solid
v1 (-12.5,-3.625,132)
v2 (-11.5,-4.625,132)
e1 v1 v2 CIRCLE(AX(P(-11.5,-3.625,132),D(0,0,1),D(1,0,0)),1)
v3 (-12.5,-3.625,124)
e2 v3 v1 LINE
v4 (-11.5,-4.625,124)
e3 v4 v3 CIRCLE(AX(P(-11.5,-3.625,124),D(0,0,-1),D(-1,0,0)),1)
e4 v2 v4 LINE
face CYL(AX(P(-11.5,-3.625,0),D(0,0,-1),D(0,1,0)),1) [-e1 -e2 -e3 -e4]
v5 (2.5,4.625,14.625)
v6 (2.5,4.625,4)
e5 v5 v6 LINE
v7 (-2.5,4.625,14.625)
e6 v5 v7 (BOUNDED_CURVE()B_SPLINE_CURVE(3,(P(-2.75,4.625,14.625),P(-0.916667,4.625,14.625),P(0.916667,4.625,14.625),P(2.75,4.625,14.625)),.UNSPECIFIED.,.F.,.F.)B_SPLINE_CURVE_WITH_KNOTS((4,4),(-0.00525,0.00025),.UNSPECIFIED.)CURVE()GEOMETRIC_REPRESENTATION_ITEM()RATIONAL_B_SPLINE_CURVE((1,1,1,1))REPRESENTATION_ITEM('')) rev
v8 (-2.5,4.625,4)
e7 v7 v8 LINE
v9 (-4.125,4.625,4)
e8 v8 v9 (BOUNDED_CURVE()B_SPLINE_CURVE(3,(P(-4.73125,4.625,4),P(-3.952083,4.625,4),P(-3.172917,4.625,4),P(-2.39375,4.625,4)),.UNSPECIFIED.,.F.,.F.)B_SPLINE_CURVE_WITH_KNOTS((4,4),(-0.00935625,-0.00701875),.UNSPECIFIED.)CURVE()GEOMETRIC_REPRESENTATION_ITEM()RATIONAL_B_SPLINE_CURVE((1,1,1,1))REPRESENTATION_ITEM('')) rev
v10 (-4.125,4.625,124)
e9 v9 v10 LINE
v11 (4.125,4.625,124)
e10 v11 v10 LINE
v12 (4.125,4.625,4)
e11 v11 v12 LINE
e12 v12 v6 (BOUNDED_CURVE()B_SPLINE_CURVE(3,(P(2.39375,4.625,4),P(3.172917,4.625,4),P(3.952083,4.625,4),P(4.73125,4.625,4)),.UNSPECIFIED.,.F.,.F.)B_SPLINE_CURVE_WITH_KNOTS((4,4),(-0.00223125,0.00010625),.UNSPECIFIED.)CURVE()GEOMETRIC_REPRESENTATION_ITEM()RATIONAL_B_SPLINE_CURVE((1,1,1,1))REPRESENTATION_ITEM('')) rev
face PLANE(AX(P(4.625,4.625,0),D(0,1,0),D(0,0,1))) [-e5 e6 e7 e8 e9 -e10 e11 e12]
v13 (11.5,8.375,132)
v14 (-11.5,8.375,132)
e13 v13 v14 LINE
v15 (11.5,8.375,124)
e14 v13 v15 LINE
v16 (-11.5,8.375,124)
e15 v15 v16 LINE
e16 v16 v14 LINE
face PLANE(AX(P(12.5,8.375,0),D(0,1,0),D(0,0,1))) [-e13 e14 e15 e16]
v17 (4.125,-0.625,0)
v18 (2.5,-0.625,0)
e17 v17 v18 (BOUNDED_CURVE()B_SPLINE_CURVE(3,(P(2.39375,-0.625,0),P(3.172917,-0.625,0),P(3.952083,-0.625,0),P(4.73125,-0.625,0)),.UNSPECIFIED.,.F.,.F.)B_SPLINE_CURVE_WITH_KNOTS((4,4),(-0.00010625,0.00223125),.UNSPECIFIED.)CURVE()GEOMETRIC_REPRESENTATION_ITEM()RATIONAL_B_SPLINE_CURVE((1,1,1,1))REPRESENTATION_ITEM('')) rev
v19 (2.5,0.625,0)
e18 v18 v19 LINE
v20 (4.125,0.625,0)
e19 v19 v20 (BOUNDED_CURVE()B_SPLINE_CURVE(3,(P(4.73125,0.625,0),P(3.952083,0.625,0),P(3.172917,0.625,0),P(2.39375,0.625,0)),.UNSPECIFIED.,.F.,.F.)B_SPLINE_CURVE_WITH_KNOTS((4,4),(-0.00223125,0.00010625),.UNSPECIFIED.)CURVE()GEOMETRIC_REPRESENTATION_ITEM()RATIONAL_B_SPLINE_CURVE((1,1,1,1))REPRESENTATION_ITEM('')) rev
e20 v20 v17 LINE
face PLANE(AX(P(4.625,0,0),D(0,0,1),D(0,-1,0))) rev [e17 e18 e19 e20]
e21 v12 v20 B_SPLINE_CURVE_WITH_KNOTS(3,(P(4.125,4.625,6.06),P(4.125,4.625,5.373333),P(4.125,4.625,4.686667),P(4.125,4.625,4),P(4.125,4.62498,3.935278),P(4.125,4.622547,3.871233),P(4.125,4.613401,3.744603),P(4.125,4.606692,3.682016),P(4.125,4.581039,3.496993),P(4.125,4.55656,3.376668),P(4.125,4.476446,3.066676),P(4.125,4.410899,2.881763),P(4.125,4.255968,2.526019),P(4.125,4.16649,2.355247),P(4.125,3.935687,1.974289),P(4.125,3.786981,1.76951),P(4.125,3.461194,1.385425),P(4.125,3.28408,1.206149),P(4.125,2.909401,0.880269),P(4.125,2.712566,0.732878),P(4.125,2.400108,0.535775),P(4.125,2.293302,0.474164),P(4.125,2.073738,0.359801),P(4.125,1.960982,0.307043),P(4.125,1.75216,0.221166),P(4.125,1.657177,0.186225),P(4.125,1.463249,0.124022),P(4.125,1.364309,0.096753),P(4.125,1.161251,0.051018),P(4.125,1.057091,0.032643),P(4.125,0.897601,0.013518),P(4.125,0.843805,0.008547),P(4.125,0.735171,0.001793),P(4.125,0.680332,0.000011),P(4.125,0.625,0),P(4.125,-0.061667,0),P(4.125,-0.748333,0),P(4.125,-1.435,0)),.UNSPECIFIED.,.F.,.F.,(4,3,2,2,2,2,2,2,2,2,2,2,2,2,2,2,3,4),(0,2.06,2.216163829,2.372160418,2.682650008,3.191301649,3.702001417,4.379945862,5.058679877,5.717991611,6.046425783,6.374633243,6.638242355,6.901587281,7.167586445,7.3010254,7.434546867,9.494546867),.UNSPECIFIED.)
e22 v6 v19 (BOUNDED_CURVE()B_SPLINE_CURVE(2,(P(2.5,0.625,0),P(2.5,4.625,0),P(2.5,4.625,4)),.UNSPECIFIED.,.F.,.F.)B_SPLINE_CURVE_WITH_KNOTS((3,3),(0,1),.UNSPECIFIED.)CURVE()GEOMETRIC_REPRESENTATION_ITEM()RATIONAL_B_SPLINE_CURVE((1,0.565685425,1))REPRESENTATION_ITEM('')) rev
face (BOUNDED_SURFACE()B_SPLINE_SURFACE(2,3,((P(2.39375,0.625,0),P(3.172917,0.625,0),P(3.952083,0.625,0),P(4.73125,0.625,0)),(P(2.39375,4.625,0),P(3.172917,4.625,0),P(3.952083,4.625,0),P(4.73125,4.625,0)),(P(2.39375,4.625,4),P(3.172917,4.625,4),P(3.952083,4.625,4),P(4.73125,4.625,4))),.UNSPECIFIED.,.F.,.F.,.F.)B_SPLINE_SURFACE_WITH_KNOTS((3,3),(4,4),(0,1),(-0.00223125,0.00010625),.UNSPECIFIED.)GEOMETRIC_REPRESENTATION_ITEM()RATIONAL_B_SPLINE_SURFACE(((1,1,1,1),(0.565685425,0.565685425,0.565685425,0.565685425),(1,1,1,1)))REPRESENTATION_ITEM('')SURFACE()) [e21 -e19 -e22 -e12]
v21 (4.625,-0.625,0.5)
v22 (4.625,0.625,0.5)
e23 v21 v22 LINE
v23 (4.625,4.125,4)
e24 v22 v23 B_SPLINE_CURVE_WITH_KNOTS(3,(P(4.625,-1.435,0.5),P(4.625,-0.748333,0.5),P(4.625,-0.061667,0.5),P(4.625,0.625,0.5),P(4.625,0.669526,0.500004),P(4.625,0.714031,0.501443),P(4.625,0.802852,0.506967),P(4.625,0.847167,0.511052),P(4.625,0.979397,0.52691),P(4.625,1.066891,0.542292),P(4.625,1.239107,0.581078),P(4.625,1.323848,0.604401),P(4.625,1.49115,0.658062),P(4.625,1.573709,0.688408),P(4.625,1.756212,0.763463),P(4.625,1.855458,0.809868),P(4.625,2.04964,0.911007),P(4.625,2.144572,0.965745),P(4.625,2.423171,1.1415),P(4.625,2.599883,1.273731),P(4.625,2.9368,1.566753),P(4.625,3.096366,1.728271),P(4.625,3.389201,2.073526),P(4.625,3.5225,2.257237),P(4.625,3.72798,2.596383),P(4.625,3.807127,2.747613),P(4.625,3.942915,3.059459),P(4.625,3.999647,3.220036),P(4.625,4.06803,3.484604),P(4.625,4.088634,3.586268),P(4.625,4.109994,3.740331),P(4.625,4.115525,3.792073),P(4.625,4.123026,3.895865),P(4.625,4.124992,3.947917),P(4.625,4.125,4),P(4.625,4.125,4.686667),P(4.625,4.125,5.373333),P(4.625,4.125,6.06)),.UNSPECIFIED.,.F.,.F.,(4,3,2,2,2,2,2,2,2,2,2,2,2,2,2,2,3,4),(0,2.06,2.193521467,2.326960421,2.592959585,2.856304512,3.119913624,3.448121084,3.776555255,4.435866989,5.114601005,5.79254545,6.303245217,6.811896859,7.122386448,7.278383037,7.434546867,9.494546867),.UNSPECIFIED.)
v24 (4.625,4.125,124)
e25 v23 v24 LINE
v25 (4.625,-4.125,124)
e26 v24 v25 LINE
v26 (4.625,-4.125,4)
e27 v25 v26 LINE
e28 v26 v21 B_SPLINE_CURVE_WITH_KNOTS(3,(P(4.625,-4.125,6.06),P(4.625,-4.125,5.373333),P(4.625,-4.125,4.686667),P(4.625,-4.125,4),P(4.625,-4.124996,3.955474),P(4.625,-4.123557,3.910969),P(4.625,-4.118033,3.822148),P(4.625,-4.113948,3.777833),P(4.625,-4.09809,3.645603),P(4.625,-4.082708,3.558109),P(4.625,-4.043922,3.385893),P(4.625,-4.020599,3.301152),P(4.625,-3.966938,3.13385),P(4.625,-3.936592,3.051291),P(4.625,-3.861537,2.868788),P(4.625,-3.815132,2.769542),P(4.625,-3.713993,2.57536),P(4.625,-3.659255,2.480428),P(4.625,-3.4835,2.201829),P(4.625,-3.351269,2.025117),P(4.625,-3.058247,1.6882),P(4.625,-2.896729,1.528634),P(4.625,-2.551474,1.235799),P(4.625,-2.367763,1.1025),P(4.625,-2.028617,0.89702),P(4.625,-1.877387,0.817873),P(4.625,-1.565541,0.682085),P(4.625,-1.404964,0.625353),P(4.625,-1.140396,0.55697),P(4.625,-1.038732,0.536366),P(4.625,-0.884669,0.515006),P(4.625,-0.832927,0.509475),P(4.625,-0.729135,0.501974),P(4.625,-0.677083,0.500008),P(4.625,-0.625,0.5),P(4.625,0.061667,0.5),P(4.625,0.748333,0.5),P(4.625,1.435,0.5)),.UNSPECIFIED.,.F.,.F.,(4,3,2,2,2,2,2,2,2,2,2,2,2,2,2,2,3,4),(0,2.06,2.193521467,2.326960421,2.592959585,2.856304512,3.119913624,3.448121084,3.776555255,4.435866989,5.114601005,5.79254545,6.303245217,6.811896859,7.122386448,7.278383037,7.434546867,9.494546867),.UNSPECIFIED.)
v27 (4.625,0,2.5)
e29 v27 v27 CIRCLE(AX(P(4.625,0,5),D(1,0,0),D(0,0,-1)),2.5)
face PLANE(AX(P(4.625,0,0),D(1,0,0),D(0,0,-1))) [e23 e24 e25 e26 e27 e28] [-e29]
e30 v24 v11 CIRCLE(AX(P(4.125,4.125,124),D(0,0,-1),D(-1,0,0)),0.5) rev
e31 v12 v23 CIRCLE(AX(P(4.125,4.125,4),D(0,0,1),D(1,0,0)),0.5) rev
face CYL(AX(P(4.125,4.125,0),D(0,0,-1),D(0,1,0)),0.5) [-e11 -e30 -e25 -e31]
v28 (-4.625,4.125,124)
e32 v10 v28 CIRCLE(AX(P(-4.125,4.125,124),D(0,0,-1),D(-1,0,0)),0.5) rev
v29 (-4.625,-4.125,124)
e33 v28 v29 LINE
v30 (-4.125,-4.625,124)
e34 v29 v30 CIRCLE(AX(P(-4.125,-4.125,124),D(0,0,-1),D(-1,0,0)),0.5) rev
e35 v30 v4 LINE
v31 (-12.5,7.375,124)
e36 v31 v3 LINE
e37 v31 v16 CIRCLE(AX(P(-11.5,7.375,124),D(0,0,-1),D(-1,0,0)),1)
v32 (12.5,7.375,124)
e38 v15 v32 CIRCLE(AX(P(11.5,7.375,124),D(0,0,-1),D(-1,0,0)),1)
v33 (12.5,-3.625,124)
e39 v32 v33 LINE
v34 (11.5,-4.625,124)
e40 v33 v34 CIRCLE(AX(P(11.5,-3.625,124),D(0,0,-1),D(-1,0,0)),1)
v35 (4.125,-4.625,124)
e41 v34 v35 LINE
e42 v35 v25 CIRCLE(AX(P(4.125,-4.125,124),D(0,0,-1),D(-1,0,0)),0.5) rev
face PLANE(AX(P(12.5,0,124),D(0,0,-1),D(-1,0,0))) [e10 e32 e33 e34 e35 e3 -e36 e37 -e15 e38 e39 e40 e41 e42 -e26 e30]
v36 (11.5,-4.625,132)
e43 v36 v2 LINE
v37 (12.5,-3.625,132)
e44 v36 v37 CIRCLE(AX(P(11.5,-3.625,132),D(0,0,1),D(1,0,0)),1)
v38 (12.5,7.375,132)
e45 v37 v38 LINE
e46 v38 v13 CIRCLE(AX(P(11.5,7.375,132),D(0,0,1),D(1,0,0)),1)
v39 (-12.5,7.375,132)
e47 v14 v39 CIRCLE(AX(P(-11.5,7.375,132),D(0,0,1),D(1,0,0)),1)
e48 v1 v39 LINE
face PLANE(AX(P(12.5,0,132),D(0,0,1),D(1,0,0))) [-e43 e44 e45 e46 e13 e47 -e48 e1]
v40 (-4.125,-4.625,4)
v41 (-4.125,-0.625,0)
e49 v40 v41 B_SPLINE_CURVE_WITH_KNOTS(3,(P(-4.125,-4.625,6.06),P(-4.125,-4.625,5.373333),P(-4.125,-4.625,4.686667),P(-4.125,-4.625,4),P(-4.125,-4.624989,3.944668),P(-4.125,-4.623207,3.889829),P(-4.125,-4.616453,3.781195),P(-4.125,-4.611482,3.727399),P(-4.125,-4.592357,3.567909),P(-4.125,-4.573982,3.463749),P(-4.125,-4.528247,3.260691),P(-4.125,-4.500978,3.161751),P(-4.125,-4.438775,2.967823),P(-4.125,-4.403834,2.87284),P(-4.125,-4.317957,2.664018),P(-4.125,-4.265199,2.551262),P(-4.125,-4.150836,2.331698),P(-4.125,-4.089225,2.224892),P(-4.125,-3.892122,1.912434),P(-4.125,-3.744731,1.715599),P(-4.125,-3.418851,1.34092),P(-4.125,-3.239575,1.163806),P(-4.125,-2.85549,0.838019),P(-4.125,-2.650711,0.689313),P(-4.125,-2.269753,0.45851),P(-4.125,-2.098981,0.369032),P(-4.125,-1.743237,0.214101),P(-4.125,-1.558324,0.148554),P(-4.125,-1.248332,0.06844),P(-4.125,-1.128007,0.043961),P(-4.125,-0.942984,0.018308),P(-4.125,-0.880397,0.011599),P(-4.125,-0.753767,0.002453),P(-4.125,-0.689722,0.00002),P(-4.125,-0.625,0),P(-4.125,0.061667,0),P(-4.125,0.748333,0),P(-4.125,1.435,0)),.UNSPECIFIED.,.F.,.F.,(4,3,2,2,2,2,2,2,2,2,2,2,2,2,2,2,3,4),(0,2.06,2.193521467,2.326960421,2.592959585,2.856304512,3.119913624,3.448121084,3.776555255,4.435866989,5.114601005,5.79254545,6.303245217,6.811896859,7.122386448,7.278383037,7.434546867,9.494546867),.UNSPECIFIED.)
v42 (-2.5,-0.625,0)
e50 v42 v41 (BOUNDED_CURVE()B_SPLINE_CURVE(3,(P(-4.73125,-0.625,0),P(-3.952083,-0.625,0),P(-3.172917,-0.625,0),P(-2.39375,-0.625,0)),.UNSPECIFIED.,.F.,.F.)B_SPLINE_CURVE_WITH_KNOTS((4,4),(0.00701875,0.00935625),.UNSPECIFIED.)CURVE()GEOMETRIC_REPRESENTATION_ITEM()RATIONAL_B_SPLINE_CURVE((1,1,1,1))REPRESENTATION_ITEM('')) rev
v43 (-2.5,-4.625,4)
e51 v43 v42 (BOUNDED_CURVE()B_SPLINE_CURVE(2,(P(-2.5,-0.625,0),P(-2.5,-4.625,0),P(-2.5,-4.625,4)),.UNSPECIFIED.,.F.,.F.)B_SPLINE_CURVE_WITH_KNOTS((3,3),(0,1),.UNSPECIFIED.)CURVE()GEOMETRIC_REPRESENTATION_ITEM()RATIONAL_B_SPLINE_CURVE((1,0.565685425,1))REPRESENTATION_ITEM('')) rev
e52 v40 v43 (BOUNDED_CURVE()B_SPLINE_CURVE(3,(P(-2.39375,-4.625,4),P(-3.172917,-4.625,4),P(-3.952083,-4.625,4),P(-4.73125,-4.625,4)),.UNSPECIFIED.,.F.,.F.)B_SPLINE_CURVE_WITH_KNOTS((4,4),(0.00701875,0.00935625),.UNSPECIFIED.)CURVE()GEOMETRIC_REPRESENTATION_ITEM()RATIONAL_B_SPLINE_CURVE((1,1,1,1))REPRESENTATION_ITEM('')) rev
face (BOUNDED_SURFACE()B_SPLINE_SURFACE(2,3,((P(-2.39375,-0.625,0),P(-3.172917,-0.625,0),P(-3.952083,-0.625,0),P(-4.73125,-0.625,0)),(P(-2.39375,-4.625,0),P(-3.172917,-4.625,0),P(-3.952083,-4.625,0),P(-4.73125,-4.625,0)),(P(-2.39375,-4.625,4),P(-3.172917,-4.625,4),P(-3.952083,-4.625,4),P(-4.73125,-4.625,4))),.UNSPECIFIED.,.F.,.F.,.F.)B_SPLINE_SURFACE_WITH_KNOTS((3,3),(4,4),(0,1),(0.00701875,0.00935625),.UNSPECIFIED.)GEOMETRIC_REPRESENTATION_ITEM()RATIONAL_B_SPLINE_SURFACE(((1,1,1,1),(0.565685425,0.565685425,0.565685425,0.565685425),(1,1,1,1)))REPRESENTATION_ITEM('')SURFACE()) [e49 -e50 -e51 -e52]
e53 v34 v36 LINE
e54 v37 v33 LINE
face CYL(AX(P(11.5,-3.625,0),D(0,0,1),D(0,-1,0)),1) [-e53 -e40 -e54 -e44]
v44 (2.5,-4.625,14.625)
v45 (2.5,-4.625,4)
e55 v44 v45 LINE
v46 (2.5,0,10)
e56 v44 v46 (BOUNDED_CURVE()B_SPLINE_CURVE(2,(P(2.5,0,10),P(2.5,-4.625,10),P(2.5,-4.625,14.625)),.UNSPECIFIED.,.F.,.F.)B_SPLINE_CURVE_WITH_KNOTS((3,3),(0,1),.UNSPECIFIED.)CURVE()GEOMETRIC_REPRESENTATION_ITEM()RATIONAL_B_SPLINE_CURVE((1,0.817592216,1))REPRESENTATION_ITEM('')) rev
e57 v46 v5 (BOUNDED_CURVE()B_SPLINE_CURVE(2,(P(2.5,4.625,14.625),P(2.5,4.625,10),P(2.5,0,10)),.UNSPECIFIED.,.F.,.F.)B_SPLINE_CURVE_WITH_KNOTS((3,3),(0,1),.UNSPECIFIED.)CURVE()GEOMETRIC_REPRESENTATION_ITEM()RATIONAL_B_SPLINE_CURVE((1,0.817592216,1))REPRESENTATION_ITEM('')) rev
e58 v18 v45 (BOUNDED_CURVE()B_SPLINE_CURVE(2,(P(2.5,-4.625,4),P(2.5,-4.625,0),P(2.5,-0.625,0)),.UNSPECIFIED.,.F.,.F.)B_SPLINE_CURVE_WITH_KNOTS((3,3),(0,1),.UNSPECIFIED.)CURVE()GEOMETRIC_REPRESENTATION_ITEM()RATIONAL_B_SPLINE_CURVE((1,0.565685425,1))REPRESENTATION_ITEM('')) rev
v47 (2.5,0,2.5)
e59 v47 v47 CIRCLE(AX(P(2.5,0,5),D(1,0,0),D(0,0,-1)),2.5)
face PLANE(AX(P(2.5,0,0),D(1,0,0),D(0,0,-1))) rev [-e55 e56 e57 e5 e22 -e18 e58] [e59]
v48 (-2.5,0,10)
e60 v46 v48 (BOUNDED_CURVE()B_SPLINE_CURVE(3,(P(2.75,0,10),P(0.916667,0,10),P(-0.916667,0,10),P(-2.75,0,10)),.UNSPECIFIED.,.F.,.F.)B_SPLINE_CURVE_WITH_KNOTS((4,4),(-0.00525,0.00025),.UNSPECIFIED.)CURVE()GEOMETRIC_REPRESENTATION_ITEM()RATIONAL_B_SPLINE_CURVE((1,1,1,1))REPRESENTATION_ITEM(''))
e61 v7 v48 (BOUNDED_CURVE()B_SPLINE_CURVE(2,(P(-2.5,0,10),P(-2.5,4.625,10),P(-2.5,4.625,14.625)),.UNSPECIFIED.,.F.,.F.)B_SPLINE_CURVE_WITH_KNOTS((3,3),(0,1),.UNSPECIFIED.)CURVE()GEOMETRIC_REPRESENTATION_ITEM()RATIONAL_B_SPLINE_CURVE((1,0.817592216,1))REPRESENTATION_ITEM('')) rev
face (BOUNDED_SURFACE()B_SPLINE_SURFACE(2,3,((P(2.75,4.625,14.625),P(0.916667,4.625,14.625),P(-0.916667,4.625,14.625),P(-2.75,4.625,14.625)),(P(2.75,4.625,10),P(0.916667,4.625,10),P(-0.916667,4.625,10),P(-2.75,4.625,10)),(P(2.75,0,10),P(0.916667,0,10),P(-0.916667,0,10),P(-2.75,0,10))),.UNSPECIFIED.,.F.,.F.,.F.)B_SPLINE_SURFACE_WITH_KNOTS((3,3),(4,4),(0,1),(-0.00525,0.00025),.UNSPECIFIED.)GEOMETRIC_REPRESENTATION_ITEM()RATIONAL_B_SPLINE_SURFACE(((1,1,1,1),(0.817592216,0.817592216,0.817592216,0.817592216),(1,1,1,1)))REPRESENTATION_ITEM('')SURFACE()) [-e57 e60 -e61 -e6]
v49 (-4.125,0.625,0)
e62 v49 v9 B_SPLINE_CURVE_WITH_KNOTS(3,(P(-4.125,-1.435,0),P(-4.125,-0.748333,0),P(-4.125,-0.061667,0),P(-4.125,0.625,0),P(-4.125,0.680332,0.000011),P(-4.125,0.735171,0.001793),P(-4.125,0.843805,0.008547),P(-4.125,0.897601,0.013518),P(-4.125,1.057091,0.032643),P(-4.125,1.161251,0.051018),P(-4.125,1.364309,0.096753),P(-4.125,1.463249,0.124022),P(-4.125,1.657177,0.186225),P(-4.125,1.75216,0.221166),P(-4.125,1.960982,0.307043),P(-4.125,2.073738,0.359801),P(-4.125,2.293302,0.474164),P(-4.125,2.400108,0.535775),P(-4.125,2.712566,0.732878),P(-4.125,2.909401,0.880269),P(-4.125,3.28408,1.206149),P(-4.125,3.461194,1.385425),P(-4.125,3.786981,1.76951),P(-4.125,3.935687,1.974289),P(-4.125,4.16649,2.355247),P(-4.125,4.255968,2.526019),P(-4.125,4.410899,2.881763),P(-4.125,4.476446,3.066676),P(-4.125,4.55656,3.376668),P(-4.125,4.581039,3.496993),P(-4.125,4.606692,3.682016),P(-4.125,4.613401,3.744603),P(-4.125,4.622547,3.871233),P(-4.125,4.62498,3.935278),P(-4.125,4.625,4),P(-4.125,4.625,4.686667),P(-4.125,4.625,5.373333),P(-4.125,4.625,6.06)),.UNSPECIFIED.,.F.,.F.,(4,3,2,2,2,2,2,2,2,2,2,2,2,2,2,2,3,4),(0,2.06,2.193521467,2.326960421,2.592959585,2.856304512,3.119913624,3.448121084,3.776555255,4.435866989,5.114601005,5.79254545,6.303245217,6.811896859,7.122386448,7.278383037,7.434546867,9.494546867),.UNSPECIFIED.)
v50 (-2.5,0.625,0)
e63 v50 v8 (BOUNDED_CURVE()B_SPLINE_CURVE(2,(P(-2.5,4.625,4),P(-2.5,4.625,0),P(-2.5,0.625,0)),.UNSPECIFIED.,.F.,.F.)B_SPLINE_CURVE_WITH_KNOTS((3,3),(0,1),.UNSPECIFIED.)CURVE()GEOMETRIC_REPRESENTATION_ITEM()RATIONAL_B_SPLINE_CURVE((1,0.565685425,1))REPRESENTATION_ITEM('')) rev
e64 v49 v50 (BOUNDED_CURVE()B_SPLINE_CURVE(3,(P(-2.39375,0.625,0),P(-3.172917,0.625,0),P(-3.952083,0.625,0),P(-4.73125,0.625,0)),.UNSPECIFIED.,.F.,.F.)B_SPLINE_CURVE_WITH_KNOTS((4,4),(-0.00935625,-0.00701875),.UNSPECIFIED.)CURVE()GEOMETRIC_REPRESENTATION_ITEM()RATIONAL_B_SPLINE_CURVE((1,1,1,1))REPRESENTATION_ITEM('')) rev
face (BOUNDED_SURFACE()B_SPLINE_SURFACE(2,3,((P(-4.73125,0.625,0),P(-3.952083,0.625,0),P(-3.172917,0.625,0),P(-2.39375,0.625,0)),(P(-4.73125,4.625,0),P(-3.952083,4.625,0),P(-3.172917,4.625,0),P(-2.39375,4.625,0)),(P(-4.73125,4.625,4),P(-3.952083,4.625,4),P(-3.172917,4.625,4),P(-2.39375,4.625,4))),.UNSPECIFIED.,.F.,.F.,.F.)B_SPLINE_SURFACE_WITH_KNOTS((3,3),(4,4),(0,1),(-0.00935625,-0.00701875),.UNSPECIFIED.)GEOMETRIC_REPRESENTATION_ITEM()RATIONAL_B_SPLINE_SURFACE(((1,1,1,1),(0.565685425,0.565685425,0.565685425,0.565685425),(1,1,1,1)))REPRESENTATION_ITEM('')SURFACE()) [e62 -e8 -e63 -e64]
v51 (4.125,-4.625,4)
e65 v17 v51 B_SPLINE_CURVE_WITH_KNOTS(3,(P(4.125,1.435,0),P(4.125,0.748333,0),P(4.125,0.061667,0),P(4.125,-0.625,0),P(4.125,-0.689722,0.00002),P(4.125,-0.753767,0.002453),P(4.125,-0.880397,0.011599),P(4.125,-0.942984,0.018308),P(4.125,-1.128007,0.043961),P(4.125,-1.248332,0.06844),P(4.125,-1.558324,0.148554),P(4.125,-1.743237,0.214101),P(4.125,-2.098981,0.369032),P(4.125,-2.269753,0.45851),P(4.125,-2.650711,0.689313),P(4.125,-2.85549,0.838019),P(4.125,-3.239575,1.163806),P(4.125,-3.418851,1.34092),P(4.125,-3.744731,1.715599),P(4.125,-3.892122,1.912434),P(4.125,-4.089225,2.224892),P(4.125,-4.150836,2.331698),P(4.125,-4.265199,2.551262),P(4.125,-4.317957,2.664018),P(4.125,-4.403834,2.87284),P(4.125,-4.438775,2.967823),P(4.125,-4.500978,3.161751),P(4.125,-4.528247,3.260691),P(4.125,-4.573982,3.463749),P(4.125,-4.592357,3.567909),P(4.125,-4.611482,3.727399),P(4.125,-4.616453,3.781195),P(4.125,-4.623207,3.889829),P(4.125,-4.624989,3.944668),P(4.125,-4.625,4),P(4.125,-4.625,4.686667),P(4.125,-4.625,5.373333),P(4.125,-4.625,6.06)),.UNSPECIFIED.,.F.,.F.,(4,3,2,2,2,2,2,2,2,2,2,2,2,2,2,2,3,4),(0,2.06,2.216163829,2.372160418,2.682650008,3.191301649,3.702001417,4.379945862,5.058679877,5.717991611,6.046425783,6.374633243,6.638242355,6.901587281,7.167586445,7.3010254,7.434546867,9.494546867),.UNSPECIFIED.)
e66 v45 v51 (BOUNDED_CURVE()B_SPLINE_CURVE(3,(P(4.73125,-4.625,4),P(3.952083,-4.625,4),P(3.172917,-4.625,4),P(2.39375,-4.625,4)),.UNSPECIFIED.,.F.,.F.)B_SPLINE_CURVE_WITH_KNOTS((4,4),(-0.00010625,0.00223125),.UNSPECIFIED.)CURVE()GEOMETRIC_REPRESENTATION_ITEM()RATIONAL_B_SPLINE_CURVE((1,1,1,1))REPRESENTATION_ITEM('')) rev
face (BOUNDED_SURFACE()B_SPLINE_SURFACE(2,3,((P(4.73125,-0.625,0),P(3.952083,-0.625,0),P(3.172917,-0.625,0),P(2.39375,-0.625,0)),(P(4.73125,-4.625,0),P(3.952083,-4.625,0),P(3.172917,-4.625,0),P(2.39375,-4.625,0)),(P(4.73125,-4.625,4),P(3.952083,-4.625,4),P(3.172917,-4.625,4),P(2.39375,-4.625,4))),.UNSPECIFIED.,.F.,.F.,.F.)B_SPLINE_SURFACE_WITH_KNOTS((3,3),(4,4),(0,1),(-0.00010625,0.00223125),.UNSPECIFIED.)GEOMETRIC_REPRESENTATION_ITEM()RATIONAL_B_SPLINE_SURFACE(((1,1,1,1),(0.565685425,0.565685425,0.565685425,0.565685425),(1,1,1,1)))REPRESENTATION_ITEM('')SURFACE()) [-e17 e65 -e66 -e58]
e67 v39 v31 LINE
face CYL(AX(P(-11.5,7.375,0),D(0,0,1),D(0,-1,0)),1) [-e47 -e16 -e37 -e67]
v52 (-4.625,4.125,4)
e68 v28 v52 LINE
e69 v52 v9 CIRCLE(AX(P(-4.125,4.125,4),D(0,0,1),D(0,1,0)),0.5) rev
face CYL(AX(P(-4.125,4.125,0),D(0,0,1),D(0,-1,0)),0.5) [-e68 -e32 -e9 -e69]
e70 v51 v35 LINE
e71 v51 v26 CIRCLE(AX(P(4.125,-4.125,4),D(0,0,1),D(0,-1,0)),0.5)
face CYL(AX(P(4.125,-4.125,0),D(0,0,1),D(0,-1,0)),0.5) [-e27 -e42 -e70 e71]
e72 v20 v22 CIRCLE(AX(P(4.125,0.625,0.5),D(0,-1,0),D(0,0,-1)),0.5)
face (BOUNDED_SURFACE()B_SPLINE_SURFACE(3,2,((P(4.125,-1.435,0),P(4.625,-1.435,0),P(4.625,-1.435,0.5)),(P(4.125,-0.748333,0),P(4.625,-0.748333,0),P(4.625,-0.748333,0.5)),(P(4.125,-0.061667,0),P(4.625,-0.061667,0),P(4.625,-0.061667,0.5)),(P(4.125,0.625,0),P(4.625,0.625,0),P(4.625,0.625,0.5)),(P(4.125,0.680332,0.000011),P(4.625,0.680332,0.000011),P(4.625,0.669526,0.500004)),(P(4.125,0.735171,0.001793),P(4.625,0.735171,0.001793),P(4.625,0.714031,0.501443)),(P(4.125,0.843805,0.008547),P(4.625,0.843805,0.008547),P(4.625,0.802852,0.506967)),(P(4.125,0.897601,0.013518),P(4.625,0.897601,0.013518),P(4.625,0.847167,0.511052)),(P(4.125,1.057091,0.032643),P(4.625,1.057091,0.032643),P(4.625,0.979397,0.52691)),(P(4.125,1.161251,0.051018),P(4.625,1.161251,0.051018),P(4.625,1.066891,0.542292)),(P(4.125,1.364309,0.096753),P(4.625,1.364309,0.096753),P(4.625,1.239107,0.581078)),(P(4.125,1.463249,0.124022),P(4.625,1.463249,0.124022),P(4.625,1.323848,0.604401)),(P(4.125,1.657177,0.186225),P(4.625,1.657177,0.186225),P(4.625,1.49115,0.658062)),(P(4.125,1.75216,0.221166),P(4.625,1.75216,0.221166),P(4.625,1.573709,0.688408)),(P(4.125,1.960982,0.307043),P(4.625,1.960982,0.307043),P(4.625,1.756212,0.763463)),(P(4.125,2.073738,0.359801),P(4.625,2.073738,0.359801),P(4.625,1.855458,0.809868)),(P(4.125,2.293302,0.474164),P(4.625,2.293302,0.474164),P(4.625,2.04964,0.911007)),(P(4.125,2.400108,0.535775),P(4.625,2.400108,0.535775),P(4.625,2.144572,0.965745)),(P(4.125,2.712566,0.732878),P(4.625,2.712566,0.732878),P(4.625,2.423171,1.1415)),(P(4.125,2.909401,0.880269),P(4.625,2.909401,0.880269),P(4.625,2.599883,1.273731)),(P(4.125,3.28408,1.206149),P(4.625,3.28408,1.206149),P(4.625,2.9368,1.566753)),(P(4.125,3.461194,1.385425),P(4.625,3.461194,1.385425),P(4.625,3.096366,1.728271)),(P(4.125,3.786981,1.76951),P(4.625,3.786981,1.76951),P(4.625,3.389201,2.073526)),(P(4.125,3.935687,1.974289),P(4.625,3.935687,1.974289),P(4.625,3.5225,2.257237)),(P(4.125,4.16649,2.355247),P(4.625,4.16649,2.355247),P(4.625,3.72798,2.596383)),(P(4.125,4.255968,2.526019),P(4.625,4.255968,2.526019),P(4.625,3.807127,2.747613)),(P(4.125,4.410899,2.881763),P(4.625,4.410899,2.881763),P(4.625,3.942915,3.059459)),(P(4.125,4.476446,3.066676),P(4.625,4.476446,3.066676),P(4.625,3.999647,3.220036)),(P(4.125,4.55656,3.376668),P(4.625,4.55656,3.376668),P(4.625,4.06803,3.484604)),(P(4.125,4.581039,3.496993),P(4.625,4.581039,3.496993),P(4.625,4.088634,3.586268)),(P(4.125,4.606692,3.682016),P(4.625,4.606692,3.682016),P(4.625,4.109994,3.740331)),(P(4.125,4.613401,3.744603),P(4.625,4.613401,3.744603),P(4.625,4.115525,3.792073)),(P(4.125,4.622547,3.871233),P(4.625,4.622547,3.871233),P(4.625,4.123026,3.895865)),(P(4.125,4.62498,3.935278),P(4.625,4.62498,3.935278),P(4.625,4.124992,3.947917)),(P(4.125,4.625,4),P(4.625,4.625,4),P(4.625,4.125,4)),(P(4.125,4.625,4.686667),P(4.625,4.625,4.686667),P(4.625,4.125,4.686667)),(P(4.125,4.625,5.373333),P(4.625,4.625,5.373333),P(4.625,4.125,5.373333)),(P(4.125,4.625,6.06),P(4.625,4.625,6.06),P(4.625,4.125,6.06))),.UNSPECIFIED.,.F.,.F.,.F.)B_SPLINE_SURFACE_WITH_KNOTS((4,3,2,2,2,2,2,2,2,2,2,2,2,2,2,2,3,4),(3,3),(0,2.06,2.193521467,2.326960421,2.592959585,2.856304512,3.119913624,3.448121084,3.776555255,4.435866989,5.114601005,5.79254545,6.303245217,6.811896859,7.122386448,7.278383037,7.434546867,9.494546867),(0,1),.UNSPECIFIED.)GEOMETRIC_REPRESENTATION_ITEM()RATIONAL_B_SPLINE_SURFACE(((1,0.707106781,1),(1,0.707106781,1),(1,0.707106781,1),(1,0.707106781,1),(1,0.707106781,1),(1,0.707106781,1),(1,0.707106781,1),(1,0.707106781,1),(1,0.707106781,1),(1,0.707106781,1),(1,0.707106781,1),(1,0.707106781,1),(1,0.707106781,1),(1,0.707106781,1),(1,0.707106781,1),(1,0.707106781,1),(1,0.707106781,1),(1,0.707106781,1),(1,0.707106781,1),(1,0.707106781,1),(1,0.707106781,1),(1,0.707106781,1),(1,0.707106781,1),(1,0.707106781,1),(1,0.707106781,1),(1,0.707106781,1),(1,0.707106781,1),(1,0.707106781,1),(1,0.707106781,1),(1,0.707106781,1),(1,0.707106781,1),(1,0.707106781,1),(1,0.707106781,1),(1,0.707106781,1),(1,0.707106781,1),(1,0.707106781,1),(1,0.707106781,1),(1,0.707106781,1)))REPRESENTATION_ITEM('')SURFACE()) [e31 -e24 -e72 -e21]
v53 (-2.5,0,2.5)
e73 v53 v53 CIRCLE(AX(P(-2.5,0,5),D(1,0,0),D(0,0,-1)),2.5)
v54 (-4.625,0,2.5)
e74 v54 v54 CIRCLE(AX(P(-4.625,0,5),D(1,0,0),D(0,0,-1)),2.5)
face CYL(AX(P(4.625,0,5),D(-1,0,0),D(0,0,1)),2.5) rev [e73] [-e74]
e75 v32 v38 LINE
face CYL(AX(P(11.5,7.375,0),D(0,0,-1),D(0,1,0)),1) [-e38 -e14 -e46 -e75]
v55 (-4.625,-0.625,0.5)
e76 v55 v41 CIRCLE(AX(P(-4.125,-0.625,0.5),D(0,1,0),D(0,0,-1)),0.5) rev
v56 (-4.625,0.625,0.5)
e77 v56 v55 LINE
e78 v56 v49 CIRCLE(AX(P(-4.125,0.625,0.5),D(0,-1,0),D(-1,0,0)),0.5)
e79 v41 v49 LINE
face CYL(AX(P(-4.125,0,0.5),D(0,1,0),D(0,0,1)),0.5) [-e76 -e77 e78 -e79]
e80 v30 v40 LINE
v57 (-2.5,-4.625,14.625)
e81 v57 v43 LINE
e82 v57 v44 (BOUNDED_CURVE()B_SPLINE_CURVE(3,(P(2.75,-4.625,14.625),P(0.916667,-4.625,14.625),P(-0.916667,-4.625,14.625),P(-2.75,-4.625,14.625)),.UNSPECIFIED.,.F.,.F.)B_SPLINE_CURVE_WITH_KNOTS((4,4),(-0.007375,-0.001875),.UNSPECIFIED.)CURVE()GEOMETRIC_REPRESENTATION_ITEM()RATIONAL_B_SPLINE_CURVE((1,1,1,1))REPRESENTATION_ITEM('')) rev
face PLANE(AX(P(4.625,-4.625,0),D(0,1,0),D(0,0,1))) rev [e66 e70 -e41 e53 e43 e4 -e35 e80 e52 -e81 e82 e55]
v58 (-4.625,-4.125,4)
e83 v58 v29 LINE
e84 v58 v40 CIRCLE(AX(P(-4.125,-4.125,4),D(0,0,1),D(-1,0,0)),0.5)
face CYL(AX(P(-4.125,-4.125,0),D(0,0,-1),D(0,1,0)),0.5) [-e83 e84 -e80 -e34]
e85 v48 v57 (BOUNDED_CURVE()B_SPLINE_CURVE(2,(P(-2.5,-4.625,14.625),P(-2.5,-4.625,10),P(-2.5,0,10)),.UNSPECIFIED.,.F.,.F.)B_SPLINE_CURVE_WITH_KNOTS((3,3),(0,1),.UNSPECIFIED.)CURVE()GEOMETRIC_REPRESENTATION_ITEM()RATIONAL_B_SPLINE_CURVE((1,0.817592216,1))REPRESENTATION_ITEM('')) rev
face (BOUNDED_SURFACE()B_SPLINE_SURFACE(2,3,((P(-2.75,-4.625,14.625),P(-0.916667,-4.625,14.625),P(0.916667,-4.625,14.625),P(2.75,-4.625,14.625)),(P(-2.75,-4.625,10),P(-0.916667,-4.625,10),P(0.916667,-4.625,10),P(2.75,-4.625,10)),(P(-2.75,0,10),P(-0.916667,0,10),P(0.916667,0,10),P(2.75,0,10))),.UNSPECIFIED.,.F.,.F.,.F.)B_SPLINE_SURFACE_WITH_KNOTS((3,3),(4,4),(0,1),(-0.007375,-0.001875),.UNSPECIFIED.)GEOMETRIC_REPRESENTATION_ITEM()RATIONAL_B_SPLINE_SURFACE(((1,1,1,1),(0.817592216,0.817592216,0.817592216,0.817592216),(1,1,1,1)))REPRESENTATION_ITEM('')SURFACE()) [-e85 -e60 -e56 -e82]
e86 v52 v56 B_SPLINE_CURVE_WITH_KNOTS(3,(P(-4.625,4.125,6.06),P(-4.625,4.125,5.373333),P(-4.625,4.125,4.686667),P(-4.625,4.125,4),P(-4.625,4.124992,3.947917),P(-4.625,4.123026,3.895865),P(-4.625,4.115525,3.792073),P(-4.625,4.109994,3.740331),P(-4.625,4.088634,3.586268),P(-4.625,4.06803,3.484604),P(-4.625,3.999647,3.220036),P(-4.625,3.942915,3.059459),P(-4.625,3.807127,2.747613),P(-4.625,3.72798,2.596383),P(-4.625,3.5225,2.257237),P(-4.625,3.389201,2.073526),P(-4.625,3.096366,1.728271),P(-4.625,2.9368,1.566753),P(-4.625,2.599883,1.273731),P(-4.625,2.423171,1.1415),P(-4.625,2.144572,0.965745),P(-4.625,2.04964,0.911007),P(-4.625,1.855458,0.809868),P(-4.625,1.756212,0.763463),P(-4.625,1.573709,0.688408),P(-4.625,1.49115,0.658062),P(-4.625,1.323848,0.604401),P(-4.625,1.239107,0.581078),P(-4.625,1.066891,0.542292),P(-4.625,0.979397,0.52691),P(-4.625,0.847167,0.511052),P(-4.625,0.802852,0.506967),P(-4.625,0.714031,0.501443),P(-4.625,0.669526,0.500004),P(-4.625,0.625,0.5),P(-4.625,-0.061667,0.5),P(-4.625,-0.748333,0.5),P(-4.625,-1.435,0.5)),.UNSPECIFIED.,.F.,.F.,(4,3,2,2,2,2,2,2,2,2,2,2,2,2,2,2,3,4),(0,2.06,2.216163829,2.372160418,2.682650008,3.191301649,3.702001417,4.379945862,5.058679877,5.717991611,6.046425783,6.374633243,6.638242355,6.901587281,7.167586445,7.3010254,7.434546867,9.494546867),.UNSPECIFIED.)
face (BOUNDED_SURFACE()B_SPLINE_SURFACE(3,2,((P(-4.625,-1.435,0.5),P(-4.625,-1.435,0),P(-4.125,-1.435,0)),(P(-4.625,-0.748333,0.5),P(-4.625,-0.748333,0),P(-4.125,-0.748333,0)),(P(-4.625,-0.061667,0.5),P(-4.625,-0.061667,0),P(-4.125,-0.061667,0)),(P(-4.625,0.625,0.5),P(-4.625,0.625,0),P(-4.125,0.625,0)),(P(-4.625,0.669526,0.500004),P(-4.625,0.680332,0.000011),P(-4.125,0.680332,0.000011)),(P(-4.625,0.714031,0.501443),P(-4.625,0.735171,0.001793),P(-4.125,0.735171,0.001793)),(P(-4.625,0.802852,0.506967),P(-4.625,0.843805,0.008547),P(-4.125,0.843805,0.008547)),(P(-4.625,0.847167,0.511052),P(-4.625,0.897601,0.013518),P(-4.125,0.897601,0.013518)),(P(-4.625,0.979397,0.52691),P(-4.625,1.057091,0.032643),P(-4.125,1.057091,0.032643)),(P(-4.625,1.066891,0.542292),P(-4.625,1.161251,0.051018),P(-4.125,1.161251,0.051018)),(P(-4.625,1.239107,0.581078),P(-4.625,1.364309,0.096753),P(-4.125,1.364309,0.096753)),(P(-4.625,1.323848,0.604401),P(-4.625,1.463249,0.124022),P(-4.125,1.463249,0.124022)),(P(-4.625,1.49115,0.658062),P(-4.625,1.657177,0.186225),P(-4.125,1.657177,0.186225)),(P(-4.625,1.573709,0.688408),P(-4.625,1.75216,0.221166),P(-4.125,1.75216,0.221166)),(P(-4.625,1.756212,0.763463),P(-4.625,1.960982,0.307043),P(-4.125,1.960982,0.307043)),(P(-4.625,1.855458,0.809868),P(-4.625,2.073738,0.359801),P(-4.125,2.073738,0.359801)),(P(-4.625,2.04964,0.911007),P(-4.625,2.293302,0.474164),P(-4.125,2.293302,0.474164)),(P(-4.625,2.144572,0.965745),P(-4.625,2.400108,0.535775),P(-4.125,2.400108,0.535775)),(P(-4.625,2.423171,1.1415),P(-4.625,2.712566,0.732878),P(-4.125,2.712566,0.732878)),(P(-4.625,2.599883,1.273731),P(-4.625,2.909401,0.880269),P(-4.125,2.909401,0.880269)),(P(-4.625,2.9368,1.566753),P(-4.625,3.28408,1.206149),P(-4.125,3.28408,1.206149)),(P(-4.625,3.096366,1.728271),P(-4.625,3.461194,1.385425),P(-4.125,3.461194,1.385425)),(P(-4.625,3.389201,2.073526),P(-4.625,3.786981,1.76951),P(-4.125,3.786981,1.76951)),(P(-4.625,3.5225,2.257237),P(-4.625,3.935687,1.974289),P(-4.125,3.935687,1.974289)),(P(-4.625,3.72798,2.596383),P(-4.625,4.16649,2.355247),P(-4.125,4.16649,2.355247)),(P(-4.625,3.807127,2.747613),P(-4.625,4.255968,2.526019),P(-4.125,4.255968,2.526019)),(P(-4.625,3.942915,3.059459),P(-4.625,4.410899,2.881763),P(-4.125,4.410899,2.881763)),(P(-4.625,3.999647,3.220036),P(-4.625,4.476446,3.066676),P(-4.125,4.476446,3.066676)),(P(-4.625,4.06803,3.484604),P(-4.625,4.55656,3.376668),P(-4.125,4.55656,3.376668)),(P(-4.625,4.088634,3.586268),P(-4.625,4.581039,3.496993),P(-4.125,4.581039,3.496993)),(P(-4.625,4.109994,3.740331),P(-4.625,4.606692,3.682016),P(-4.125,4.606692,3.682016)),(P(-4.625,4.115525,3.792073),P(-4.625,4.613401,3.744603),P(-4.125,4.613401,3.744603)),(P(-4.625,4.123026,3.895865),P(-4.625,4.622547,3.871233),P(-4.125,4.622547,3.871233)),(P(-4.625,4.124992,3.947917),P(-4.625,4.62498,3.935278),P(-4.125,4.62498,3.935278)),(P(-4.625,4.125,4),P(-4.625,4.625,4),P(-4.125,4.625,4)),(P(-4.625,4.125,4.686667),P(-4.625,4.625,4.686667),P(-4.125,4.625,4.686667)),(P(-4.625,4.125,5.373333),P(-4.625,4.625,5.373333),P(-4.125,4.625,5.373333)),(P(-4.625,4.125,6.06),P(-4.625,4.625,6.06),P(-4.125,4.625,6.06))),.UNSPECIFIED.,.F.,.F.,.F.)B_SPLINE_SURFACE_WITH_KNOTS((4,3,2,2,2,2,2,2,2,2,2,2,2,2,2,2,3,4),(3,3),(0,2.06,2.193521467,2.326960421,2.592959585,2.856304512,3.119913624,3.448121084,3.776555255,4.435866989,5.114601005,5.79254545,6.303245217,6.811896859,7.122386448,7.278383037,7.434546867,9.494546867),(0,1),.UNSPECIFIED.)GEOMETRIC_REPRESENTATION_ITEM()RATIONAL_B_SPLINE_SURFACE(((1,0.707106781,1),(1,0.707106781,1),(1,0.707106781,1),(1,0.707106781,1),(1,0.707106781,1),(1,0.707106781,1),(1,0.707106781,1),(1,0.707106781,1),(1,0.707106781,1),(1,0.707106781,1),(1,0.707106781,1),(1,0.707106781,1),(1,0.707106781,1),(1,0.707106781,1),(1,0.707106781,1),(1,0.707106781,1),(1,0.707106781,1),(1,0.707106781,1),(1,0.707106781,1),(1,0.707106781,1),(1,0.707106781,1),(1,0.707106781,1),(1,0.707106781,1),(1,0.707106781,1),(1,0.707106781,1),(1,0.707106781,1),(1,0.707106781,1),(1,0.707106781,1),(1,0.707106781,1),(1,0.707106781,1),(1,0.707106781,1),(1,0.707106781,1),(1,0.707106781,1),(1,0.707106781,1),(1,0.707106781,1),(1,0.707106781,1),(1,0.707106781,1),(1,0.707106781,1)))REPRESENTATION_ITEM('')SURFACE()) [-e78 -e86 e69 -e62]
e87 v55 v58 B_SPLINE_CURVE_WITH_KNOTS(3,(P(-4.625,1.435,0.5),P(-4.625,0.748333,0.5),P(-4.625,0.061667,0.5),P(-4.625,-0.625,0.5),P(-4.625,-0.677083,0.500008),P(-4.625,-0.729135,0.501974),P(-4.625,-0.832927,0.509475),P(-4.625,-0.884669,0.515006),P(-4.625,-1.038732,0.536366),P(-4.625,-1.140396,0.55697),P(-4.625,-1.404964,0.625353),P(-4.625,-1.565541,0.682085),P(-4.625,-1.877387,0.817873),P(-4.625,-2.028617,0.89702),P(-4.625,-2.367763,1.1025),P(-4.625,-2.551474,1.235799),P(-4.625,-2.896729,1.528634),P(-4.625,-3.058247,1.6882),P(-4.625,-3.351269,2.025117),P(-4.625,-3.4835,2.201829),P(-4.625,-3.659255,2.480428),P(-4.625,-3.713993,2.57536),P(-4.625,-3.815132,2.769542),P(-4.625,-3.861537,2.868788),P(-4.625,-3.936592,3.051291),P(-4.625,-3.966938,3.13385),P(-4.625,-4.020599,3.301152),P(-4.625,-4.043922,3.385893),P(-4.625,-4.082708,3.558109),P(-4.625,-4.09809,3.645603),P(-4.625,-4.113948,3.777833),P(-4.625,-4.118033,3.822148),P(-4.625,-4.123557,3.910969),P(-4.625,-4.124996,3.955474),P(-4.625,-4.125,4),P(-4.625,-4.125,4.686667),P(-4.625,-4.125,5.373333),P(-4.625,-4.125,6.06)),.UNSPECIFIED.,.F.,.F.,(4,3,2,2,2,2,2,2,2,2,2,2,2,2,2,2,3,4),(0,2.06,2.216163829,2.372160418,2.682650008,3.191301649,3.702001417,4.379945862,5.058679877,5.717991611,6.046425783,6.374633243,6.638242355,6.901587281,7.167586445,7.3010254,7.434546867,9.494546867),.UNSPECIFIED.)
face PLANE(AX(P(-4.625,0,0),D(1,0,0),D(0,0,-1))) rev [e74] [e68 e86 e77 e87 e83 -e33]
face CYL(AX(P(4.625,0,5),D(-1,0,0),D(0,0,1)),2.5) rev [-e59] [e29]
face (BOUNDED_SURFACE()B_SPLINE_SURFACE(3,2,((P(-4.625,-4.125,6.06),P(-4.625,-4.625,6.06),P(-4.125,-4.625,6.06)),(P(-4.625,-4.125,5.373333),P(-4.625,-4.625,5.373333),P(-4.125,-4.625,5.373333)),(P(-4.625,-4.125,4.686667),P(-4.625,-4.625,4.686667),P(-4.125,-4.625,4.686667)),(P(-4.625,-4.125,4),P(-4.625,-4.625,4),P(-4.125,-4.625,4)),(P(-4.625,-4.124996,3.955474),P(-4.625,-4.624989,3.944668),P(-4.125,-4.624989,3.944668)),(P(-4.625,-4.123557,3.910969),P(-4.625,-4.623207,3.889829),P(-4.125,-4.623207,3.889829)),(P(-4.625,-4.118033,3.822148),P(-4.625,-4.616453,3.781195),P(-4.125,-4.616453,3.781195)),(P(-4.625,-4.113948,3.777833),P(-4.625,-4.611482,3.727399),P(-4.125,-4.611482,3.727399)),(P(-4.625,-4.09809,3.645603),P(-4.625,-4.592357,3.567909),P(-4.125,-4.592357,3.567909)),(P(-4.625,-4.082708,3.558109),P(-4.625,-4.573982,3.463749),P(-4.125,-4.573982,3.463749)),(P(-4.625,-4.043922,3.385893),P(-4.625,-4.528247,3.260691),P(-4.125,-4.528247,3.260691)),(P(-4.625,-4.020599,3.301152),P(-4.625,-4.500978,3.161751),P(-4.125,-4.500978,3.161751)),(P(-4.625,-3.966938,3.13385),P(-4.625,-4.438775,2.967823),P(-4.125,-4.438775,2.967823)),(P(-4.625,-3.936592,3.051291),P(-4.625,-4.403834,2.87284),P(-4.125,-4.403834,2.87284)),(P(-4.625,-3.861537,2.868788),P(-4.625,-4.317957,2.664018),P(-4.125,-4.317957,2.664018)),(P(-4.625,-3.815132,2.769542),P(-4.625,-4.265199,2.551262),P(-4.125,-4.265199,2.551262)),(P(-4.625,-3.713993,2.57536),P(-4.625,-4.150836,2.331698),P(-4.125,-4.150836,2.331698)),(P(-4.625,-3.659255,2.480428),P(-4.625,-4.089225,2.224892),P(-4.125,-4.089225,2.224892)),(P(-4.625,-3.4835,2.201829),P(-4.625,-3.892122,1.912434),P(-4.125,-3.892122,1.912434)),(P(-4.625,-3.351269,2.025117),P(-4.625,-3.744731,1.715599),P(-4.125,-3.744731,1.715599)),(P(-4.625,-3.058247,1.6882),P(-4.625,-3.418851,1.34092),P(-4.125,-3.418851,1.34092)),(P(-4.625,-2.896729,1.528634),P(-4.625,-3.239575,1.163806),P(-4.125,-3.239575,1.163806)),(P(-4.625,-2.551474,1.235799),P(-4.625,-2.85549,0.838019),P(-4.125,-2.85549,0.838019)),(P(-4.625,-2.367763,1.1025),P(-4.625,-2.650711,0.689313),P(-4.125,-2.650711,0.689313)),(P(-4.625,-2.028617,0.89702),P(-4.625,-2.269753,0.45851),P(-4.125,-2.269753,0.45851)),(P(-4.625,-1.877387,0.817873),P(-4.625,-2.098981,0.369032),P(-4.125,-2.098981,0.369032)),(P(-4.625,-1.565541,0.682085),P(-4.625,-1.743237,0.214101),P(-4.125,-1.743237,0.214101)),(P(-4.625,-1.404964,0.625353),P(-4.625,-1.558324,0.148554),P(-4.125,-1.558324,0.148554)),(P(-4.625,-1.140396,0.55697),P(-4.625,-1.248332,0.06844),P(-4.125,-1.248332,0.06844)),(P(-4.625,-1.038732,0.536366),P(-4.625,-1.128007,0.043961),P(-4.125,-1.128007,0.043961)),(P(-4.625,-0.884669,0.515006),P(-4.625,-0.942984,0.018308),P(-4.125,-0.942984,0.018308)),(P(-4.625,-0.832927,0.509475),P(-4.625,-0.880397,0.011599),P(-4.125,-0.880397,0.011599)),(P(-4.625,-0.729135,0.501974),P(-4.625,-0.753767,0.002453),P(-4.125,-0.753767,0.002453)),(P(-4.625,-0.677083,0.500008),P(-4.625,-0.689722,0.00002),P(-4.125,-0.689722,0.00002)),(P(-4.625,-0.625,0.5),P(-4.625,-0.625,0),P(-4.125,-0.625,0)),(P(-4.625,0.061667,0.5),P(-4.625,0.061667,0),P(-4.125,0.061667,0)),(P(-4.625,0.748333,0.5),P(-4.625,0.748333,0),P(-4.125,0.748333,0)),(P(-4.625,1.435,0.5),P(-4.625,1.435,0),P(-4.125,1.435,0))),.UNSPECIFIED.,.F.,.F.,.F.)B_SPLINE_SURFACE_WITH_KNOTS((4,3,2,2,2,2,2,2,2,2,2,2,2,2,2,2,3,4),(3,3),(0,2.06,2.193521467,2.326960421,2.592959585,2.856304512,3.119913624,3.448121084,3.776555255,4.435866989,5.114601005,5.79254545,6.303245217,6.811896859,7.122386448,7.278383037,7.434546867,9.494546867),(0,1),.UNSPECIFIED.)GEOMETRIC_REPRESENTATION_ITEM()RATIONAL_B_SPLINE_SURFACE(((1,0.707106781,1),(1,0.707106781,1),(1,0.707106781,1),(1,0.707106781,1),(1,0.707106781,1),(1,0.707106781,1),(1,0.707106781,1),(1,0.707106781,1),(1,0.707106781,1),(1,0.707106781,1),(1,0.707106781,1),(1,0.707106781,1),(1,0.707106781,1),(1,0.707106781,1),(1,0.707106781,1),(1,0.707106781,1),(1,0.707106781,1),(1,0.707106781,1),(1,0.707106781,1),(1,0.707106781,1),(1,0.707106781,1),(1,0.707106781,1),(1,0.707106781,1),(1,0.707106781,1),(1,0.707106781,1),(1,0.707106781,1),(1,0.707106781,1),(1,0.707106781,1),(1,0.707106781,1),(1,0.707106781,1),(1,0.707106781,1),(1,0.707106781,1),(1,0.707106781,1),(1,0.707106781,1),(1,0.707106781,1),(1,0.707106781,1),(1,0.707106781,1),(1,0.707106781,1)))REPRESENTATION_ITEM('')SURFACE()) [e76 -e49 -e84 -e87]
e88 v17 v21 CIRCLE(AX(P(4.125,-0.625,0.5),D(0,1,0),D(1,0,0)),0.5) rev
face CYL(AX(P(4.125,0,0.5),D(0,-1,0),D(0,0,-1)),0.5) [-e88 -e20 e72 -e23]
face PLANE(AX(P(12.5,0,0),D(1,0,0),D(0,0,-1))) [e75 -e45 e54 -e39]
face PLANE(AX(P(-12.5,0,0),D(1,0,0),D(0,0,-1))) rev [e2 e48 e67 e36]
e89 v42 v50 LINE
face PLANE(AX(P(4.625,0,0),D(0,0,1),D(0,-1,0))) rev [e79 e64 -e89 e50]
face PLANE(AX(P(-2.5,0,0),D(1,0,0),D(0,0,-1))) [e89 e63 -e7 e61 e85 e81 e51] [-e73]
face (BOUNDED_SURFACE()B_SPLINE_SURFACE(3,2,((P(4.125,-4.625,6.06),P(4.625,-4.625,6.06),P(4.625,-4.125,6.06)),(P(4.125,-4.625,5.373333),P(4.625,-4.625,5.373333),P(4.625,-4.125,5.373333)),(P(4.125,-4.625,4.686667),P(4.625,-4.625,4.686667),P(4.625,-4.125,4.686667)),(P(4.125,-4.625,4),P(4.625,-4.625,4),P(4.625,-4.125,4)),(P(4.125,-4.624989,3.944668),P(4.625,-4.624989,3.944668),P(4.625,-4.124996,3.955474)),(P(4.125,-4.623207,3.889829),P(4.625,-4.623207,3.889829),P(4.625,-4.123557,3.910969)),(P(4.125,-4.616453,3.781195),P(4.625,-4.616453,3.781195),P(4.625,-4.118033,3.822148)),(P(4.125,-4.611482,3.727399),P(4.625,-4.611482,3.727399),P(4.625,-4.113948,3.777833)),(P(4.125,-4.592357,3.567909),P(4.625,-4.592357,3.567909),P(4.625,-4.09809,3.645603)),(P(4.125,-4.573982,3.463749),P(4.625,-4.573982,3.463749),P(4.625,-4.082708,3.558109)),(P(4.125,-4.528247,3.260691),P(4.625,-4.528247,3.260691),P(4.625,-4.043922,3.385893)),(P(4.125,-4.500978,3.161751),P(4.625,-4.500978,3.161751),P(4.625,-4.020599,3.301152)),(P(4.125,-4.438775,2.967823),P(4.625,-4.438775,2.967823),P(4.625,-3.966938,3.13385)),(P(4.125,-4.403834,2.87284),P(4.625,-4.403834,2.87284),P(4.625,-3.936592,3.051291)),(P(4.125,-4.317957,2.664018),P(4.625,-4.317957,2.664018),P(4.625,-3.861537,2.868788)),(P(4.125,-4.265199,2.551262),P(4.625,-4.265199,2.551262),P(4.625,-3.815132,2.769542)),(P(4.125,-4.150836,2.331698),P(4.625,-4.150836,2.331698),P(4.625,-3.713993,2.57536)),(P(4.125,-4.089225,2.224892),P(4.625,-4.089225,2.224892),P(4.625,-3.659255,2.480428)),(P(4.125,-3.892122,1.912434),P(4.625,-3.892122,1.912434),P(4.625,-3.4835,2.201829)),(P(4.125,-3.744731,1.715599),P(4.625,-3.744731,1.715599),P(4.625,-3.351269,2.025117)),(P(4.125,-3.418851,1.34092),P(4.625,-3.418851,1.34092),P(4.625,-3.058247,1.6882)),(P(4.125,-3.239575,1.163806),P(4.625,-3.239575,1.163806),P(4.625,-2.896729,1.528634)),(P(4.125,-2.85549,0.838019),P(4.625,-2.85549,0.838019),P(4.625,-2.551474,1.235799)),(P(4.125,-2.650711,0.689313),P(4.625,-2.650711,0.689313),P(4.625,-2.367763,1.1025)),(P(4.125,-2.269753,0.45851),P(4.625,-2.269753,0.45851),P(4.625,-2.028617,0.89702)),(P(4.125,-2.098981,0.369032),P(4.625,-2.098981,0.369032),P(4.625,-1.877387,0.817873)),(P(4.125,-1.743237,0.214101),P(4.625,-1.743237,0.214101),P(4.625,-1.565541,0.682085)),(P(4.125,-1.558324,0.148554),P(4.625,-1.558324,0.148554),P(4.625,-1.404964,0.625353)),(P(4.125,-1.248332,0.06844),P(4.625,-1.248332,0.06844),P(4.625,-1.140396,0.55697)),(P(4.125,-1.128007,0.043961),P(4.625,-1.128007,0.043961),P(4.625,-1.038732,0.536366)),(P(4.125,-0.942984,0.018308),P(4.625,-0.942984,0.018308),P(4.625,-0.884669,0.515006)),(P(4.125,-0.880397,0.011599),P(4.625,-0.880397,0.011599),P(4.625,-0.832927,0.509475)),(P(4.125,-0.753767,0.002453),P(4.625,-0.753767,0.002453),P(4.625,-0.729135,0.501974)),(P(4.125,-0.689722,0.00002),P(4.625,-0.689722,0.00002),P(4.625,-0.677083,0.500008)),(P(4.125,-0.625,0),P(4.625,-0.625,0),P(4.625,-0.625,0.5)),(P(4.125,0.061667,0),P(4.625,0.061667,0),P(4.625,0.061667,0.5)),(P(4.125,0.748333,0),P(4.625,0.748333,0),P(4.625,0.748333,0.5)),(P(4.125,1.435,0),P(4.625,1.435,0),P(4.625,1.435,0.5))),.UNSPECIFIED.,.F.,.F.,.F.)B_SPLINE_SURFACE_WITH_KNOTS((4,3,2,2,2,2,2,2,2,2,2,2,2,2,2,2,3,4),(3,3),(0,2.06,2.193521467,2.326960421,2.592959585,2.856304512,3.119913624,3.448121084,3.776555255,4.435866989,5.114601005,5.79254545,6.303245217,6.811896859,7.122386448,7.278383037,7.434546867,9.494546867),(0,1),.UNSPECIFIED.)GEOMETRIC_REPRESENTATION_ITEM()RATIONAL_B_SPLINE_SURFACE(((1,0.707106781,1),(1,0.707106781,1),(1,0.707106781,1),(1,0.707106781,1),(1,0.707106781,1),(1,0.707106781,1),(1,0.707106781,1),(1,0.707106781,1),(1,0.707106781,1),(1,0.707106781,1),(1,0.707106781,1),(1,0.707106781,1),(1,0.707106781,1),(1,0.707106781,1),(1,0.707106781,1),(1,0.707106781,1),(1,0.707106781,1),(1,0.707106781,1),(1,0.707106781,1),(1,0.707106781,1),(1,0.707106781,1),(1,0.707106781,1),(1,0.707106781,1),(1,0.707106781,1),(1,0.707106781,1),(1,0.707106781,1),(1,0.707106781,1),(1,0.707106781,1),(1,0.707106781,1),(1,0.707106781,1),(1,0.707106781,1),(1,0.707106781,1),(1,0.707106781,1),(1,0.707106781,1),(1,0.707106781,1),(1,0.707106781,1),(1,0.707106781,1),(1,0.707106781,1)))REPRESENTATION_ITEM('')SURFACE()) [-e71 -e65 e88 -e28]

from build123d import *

# Parameters (mm, degrees)
CROQUIS1_W              = 9.25
CROQUIS1_H              = 114
CROQUIS1_H_2            = 10
CROQUIS1_R              = 2.5
SALIENTE_EXTRUIR1_DEPTH = 4.625
SALIENTE_EXTRUIR2_DEPTH = 12.5
CROQUIS1_4_W            = 9.25
CROQUIS1_4_H            = 10
CROQUIS1_4_R            = 2.5
CORTAR_EXTRUIR1_DEPTH   = 2.5
REDONDEO1_SIZE          = 4
REDONDEO2_SIZE          = 4.625
REDONDEO3_R             = 0.5
REDONDEO4_R             = 1


with BuildPart() as part:
    # Croquis1 → Saliente-Extruir1 (new, symmetric)
    # profile 1 of 2: a face of its own
    with BuildSketch(Plane.YZ):
        with Locations((0, 67)):
            Rectangle(CROQUIS1_W, CROQUIS1_H)
    # profile 2 of 2: a face of its own
    with BuildSketch(Plane.YZ):
        with Locations((0, 5)):
            Rectangle(CROQUIS1_W, CROQUIS1_H_2)
        with Locations(Location((0, 5, 0), (0, 0, 270))):
            Circle(CROQUIS1_R, mode=Mode.SUBTRACT)
    extrude(amount=SALIENTE_EXTRUIR1_DEPTH, both=True)

    # Croquis1<3> → Saliente-Extruir2 (add, symmetric)
    with BuildSketch(Plane.YZ):
        Polygon((4.625, 132), (-4.625, 132), (-4.625, 124), (4.625, 124), (8.375, 124), (8.375, 132), align=None)
    extrude(amount=SALIENTE_EXTRUIR2_DEPTH, both=True)

    # Croquis1<4> → Cortar-Extruir1 (cut, symmetric)
    with BuildSketch(Plane.YZ):
        with Locations((0, 5)):
            Rectangle(CROQUIS1_4_W, CROQUIS1_4_H)
        with Locations(Location((0, 5, 0), (0, 0, 270))):
            Circle(CROQUIS1_4_R, mode=Mode.SUBTRACT)
    extrude(amount=CORTAR_EXTRUIR1_DEPTH, both=True, mode=Mode.SUBTRACT)

    # Redondeo1
    # a fillet whose section is not a circle: 4 mm, written as the material it takes off along each edge
    with BuildSketch(Plane(origin=(14.625, -4.625, 0), x_dir=(0, 0, 1), z_dir=(-1, 0, 0)), Plane(origin=(14.625, 4.625, 0), x_dir=(0, -1, 0), z_dir=(-1, 0, 0))) as redondeo1_piece_1:
        with BuildLine():
            Bezier((REDONDEO1_SIZE, 0), (0, 0), (0, REDONDEO1_SIZE), weights=[1, 0.565685425, 1])
            Line((0, REDONDEO1_SIZE), (0, 0))
            Line((0, 0), (REDONDEO1_SIZE, 0))
        make_face()
    extrude(amount=22.125, mode=Mode.SUBTRACT)

    # Redondeo2
    # a fillet whose section is not a circle: 4.625 mm, written as the material it takes off along each edge
    with BuildSketch(Plane(origin=(-2.5, 4.625, 10), x_dir=(0, -1, 0), z_dir=(1, 0, 0)), Plane(origin=(-2.5, -4.625, 10), x_dir=(0, 0, 1), z_dir=(1, 0, 0))) as redondeo2_piece_1:
        with BuildLine():
            Bezier((REDONDEO2_SIZE, 0), (0, 0), (0, -REDONDEO2_SIZE), weights=[1, 0.817592216, 1])
            Line((0, -REDONDEO2_SIZE), (0, 0))
            Line((0, 0), (REDONDEO2_SIZE, 0))
        make_face()
    extrude(amount=5, mode=Mode.SUBTRACT)

    # Redondeo3
    redondeo3_edges = [part.edges().sort_by_distance(p)[0] for p in [
        (4.625, 4.625, 64),
        (4.625, 0, 0),
        (4.625, -4.625, 64),
        (4.625, 3.347604191, 1.277395809),
        (4.625, -3.347604191, 1.277395809),
        (-4.625, 0, 0),
        (-4.625, 3.347604191, 1.277395809),
        (-4.625, -3.347604191, 1.277395809),
        (-4.625, 4.625, 64),
        (-4.625, -4.625, 64),
    ]]
    fillet(redondeo3_edges, radius=REDONDEO3_R)

    # Redondeo4
    redondeo4_edges = [part.edges().sort_by_distance(p)[0] for p in [
        (12.5, 8.375, 128),
        (-12.5, -4.625, 128),
        (12.5, -4.625, 128),
        (-12.5, 8.375, 128),
    ]]
    fillet(redondeo4_edges, radius=REDONDEO4_R)


solid = part.part
